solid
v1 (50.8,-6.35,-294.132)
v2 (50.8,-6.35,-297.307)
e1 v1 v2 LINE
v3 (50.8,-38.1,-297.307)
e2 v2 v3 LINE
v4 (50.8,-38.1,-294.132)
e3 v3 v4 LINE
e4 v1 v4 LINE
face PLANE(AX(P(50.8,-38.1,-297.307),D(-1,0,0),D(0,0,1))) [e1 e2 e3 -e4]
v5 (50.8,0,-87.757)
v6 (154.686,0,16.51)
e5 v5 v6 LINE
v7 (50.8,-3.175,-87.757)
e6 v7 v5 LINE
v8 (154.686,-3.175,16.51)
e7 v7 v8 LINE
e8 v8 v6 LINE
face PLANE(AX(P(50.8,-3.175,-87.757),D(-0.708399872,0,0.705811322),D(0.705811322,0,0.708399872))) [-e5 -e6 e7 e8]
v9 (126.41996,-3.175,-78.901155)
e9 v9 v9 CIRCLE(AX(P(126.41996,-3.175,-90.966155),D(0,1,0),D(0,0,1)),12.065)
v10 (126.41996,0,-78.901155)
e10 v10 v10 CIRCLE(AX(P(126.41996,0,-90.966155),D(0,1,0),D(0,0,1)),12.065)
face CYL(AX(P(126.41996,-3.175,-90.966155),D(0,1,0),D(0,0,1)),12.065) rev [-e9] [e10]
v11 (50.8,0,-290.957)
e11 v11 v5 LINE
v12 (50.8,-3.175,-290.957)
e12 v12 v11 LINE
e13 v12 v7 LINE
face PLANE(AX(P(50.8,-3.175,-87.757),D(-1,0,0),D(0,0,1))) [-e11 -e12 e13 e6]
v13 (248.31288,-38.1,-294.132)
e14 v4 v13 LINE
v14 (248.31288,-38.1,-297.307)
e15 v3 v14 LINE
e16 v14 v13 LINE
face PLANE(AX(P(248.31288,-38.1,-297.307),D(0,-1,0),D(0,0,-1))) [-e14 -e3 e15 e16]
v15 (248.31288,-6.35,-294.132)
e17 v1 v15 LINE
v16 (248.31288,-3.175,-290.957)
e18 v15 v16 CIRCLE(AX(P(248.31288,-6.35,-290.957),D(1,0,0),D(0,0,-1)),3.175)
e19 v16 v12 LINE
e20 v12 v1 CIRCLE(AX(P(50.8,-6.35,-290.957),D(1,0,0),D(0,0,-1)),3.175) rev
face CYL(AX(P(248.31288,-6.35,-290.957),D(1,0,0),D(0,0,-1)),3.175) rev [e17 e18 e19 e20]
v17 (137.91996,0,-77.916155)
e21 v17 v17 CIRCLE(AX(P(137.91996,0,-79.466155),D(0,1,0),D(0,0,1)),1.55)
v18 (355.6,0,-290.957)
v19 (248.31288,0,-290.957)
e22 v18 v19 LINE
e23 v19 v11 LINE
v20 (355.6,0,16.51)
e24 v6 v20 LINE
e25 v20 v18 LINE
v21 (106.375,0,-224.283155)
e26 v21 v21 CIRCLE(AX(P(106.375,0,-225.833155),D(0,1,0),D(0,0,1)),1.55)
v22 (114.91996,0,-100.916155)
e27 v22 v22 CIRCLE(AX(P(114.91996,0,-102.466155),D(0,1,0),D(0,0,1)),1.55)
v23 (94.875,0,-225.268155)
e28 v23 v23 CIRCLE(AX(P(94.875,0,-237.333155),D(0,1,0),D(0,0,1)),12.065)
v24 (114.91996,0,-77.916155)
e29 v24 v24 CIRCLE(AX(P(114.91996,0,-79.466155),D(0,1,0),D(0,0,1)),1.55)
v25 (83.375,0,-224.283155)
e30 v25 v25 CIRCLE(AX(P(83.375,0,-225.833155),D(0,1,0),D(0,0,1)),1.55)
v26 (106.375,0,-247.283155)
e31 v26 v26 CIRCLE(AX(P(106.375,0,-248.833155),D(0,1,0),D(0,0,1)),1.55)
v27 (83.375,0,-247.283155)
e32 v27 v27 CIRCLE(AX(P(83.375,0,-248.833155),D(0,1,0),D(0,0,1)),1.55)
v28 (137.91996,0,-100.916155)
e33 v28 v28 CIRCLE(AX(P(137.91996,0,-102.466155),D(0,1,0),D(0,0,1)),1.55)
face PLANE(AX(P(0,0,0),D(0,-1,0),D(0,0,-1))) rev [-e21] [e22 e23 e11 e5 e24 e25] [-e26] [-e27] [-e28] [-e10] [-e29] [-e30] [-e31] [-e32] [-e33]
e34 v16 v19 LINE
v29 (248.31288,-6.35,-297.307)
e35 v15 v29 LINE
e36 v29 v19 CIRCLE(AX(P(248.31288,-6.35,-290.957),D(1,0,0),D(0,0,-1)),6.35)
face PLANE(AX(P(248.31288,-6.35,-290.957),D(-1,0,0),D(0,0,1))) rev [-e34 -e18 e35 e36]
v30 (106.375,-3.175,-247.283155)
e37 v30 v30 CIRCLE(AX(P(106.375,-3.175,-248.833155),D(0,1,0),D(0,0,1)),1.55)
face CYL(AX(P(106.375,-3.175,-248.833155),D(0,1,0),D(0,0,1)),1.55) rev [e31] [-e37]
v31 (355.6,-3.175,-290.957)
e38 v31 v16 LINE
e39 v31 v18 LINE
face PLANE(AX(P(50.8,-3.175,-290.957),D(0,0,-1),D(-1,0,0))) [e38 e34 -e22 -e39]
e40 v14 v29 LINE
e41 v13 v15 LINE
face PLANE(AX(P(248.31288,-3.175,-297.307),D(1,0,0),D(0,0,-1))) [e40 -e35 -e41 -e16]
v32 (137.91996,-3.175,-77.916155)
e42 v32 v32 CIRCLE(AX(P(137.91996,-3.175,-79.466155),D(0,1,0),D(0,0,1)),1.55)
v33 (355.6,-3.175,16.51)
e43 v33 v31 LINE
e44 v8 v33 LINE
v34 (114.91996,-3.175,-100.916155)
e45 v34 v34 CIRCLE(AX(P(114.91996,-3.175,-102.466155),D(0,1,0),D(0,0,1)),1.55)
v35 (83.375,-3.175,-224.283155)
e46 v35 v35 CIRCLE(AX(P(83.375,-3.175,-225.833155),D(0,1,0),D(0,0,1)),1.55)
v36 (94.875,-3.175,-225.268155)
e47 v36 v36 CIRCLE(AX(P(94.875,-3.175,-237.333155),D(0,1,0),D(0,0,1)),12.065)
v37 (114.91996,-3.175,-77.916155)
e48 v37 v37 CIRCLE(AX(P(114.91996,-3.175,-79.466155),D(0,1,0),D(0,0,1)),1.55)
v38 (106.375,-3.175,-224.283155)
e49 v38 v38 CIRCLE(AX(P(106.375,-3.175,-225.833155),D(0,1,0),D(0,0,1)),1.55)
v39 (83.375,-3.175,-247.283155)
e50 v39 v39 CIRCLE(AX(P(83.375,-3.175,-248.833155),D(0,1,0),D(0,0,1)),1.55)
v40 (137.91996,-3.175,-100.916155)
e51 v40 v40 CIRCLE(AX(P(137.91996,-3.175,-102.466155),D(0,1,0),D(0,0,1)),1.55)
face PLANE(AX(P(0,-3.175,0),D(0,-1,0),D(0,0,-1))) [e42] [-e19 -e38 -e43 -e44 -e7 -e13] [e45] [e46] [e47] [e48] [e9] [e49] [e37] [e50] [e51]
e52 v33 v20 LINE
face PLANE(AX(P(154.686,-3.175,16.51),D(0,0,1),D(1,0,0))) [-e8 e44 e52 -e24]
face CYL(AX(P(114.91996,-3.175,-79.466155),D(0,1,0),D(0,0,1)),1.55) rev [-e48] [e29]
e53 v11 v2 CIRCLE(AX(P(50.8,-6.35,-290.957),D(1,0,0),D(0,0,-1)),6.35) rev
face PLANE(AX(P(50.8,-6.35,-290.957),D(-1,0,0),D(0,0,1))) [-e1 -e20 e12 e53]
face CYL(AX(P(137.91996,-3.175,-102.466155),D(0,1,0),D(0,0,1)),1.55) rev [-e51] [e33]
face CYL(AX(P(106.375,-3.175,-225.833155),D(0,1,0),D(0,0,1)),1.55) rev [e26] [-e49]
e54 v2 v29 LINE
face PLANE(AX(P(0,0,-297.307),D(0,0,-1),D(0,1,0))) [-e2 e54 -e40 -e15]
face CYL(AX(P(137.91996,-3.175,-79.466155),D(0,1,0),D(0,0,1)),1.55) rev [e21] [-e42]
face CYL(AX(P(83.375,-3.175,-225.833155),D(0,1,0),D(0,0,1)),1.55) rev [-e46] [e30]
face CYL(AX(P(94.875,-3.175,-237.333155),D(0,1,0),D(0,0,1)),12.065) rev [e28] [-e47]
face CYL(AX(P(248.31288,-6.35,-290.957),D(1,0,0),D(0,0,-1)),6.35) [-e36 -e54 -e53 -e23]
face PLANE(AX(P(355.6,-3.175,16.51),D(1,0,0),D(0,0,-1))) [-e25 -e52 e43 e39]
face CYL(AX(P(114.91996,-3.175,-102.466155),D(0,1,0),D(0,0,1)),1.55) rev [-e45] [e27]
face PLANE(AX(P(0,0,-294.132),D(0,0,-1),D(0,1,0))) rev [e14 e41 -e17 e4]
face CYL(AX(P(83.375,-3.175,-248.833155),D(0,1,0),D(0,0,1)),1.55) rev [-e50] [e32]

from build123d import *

# Parameters (mm, degrees)
BASE_FLANGE1_DEPTH = 3.175
EDGE_FLANGE1_DEPTH = 197.512880056
SKETCH9_R          = 12.065
CUT_EXTRUDE1_DEPTH = 3.175


# Sheet-metal steps are written as plain solids
with BuildPart() as part:
    # Sketch1 → Base-Flange1 (new body)
    with BuildSketch(Plane(origin=(0, 0, 0), x_dir=(1, 0, 0), z_dir=(0, 1, 0))):
        Polygon((154.686, -16.51), (355.6, -16.51), (355.6, 290.957), (50.8, 290.957), (50.8, 87.757), align=None)
    extrude(amount=-BASE_FLANGE1_DEPTH)

    # Edge-Flange1 section (across the edge) → Edge-Flange1 (add)
    with BuildSketch(Plane(origin=(50.8, -3.175, -294.132), x_dir=(0, 0, 1), z_dir=(1, 0, 0))):
        with BuildLine():
            Line((-3.175, 3.175), (-3.175, 34.925))
            Line((-3.175, 34.925), (0, 34.925))
            Line((0, 34.925), (0, 3.175))
            ThreePointArc((0, 3.175), (0.92993597, 0.92993597), (3.175, 0))
            Line((3.175, 0), (3.175, -3.175))
            ThreePointArc((3.175, -3.175), (-1.315128061, -1.315128061), (-3.175, 3.175))
        make_face()
    extrude(amount=EDGE_FLANGE1_DEPTH)

    # Sketch9 → Cut-Extrude1 (cut)
    with BuildSketch(Plane(origin=(0, 0, 0), x_dir=(1, 0, 0), z_dir=(0, 1, 0))):
        with BuildLine():
            ThreePointArc((84.925, 225.833155379), (83.375, 227.383155379), (81.825, 225.833155379))
            ThreePointArc((81.825, 225.833155379), (83.375, 224.283155379), (84.925, 225.833155379))
        make_face()
        with BuildLine():
            ThreePointArc((104.825, 225.833155379), (106.375, 224.283155379), (107.925, 225.833155379))
            ThreePointArc((107.925, 225.833155379), (106.375, 227.383155379), (104.825, 225.833155379))
        make_face()
        with BuildLine():
            ThreePointArc((104.825, 248.833155379), (106.375, 247.283155379), (107.925, 248.833155379))
            ThreePointArc((107.925, 248.833155379), (106.375, 250.383155379), (104.825, 248.833155379))
        make_face()
        with BuildLine():
            ThreePointArc((84.925, 248.833155379), (83.375, 250.383155379), (81.825, 248.833155379))
            ThreePointArc((81.825, 248.833155379), (83.375, 247.283155379), (84.925, 248.833155379))
        make_face()
        with Locations(Location((94.875, 237.333155379, 0), (0, 0, 270))):
            Circle(SKETCH9_R)
        with BuildLine():
            ThreePointArc((136.36996, 79.466155379), (137.91996, 77.916155379), (139.46996, 79.466155379))
            ThreePointArc((139.46996, 79.466155379), (137.91996, 81.016155379), (136.36996, 79.466155379))
        make_face()
        with BuildLine():
            ThreePointArc((136.36996, 102.466155379), (137.91996, 100.916155379), (139.46996, 102.466155379))
            ThreePointArc((139.46996, 102.466155379), (137.91996, 104.016155379), (136.36996, 102.466155379))
        make_face()
        with Locations(Location((126.41996, 90.966155379, 0), (0, 0, 270))):
            Circle(SKETCH9_R)
        with BuildLine():
            ThreePointArc((113.36996, 102.466155379), (114.91996, 100.916155379), (116.46996, 102.466155379))
            ThreePointArc((116.46996, 102.466155379), (114.91996, 104.016155379), (113.36996, 102.466155379))
        make_face()
        with BuildLine():
            ThreePointArc((113.36996, 79.466155379), (114.91996, 77.916155379), (116.46996, 79.466155379))
            ThreePointArc((116.46996, 79.466155379), (114.91996, 81.016155379), (113.36996, 79.466155379))
        make_face()
    extrude(amount=-CUT_EXTRUDE1_DEPTH, mode=Mode.SUBTRACT)


solid = part.part
